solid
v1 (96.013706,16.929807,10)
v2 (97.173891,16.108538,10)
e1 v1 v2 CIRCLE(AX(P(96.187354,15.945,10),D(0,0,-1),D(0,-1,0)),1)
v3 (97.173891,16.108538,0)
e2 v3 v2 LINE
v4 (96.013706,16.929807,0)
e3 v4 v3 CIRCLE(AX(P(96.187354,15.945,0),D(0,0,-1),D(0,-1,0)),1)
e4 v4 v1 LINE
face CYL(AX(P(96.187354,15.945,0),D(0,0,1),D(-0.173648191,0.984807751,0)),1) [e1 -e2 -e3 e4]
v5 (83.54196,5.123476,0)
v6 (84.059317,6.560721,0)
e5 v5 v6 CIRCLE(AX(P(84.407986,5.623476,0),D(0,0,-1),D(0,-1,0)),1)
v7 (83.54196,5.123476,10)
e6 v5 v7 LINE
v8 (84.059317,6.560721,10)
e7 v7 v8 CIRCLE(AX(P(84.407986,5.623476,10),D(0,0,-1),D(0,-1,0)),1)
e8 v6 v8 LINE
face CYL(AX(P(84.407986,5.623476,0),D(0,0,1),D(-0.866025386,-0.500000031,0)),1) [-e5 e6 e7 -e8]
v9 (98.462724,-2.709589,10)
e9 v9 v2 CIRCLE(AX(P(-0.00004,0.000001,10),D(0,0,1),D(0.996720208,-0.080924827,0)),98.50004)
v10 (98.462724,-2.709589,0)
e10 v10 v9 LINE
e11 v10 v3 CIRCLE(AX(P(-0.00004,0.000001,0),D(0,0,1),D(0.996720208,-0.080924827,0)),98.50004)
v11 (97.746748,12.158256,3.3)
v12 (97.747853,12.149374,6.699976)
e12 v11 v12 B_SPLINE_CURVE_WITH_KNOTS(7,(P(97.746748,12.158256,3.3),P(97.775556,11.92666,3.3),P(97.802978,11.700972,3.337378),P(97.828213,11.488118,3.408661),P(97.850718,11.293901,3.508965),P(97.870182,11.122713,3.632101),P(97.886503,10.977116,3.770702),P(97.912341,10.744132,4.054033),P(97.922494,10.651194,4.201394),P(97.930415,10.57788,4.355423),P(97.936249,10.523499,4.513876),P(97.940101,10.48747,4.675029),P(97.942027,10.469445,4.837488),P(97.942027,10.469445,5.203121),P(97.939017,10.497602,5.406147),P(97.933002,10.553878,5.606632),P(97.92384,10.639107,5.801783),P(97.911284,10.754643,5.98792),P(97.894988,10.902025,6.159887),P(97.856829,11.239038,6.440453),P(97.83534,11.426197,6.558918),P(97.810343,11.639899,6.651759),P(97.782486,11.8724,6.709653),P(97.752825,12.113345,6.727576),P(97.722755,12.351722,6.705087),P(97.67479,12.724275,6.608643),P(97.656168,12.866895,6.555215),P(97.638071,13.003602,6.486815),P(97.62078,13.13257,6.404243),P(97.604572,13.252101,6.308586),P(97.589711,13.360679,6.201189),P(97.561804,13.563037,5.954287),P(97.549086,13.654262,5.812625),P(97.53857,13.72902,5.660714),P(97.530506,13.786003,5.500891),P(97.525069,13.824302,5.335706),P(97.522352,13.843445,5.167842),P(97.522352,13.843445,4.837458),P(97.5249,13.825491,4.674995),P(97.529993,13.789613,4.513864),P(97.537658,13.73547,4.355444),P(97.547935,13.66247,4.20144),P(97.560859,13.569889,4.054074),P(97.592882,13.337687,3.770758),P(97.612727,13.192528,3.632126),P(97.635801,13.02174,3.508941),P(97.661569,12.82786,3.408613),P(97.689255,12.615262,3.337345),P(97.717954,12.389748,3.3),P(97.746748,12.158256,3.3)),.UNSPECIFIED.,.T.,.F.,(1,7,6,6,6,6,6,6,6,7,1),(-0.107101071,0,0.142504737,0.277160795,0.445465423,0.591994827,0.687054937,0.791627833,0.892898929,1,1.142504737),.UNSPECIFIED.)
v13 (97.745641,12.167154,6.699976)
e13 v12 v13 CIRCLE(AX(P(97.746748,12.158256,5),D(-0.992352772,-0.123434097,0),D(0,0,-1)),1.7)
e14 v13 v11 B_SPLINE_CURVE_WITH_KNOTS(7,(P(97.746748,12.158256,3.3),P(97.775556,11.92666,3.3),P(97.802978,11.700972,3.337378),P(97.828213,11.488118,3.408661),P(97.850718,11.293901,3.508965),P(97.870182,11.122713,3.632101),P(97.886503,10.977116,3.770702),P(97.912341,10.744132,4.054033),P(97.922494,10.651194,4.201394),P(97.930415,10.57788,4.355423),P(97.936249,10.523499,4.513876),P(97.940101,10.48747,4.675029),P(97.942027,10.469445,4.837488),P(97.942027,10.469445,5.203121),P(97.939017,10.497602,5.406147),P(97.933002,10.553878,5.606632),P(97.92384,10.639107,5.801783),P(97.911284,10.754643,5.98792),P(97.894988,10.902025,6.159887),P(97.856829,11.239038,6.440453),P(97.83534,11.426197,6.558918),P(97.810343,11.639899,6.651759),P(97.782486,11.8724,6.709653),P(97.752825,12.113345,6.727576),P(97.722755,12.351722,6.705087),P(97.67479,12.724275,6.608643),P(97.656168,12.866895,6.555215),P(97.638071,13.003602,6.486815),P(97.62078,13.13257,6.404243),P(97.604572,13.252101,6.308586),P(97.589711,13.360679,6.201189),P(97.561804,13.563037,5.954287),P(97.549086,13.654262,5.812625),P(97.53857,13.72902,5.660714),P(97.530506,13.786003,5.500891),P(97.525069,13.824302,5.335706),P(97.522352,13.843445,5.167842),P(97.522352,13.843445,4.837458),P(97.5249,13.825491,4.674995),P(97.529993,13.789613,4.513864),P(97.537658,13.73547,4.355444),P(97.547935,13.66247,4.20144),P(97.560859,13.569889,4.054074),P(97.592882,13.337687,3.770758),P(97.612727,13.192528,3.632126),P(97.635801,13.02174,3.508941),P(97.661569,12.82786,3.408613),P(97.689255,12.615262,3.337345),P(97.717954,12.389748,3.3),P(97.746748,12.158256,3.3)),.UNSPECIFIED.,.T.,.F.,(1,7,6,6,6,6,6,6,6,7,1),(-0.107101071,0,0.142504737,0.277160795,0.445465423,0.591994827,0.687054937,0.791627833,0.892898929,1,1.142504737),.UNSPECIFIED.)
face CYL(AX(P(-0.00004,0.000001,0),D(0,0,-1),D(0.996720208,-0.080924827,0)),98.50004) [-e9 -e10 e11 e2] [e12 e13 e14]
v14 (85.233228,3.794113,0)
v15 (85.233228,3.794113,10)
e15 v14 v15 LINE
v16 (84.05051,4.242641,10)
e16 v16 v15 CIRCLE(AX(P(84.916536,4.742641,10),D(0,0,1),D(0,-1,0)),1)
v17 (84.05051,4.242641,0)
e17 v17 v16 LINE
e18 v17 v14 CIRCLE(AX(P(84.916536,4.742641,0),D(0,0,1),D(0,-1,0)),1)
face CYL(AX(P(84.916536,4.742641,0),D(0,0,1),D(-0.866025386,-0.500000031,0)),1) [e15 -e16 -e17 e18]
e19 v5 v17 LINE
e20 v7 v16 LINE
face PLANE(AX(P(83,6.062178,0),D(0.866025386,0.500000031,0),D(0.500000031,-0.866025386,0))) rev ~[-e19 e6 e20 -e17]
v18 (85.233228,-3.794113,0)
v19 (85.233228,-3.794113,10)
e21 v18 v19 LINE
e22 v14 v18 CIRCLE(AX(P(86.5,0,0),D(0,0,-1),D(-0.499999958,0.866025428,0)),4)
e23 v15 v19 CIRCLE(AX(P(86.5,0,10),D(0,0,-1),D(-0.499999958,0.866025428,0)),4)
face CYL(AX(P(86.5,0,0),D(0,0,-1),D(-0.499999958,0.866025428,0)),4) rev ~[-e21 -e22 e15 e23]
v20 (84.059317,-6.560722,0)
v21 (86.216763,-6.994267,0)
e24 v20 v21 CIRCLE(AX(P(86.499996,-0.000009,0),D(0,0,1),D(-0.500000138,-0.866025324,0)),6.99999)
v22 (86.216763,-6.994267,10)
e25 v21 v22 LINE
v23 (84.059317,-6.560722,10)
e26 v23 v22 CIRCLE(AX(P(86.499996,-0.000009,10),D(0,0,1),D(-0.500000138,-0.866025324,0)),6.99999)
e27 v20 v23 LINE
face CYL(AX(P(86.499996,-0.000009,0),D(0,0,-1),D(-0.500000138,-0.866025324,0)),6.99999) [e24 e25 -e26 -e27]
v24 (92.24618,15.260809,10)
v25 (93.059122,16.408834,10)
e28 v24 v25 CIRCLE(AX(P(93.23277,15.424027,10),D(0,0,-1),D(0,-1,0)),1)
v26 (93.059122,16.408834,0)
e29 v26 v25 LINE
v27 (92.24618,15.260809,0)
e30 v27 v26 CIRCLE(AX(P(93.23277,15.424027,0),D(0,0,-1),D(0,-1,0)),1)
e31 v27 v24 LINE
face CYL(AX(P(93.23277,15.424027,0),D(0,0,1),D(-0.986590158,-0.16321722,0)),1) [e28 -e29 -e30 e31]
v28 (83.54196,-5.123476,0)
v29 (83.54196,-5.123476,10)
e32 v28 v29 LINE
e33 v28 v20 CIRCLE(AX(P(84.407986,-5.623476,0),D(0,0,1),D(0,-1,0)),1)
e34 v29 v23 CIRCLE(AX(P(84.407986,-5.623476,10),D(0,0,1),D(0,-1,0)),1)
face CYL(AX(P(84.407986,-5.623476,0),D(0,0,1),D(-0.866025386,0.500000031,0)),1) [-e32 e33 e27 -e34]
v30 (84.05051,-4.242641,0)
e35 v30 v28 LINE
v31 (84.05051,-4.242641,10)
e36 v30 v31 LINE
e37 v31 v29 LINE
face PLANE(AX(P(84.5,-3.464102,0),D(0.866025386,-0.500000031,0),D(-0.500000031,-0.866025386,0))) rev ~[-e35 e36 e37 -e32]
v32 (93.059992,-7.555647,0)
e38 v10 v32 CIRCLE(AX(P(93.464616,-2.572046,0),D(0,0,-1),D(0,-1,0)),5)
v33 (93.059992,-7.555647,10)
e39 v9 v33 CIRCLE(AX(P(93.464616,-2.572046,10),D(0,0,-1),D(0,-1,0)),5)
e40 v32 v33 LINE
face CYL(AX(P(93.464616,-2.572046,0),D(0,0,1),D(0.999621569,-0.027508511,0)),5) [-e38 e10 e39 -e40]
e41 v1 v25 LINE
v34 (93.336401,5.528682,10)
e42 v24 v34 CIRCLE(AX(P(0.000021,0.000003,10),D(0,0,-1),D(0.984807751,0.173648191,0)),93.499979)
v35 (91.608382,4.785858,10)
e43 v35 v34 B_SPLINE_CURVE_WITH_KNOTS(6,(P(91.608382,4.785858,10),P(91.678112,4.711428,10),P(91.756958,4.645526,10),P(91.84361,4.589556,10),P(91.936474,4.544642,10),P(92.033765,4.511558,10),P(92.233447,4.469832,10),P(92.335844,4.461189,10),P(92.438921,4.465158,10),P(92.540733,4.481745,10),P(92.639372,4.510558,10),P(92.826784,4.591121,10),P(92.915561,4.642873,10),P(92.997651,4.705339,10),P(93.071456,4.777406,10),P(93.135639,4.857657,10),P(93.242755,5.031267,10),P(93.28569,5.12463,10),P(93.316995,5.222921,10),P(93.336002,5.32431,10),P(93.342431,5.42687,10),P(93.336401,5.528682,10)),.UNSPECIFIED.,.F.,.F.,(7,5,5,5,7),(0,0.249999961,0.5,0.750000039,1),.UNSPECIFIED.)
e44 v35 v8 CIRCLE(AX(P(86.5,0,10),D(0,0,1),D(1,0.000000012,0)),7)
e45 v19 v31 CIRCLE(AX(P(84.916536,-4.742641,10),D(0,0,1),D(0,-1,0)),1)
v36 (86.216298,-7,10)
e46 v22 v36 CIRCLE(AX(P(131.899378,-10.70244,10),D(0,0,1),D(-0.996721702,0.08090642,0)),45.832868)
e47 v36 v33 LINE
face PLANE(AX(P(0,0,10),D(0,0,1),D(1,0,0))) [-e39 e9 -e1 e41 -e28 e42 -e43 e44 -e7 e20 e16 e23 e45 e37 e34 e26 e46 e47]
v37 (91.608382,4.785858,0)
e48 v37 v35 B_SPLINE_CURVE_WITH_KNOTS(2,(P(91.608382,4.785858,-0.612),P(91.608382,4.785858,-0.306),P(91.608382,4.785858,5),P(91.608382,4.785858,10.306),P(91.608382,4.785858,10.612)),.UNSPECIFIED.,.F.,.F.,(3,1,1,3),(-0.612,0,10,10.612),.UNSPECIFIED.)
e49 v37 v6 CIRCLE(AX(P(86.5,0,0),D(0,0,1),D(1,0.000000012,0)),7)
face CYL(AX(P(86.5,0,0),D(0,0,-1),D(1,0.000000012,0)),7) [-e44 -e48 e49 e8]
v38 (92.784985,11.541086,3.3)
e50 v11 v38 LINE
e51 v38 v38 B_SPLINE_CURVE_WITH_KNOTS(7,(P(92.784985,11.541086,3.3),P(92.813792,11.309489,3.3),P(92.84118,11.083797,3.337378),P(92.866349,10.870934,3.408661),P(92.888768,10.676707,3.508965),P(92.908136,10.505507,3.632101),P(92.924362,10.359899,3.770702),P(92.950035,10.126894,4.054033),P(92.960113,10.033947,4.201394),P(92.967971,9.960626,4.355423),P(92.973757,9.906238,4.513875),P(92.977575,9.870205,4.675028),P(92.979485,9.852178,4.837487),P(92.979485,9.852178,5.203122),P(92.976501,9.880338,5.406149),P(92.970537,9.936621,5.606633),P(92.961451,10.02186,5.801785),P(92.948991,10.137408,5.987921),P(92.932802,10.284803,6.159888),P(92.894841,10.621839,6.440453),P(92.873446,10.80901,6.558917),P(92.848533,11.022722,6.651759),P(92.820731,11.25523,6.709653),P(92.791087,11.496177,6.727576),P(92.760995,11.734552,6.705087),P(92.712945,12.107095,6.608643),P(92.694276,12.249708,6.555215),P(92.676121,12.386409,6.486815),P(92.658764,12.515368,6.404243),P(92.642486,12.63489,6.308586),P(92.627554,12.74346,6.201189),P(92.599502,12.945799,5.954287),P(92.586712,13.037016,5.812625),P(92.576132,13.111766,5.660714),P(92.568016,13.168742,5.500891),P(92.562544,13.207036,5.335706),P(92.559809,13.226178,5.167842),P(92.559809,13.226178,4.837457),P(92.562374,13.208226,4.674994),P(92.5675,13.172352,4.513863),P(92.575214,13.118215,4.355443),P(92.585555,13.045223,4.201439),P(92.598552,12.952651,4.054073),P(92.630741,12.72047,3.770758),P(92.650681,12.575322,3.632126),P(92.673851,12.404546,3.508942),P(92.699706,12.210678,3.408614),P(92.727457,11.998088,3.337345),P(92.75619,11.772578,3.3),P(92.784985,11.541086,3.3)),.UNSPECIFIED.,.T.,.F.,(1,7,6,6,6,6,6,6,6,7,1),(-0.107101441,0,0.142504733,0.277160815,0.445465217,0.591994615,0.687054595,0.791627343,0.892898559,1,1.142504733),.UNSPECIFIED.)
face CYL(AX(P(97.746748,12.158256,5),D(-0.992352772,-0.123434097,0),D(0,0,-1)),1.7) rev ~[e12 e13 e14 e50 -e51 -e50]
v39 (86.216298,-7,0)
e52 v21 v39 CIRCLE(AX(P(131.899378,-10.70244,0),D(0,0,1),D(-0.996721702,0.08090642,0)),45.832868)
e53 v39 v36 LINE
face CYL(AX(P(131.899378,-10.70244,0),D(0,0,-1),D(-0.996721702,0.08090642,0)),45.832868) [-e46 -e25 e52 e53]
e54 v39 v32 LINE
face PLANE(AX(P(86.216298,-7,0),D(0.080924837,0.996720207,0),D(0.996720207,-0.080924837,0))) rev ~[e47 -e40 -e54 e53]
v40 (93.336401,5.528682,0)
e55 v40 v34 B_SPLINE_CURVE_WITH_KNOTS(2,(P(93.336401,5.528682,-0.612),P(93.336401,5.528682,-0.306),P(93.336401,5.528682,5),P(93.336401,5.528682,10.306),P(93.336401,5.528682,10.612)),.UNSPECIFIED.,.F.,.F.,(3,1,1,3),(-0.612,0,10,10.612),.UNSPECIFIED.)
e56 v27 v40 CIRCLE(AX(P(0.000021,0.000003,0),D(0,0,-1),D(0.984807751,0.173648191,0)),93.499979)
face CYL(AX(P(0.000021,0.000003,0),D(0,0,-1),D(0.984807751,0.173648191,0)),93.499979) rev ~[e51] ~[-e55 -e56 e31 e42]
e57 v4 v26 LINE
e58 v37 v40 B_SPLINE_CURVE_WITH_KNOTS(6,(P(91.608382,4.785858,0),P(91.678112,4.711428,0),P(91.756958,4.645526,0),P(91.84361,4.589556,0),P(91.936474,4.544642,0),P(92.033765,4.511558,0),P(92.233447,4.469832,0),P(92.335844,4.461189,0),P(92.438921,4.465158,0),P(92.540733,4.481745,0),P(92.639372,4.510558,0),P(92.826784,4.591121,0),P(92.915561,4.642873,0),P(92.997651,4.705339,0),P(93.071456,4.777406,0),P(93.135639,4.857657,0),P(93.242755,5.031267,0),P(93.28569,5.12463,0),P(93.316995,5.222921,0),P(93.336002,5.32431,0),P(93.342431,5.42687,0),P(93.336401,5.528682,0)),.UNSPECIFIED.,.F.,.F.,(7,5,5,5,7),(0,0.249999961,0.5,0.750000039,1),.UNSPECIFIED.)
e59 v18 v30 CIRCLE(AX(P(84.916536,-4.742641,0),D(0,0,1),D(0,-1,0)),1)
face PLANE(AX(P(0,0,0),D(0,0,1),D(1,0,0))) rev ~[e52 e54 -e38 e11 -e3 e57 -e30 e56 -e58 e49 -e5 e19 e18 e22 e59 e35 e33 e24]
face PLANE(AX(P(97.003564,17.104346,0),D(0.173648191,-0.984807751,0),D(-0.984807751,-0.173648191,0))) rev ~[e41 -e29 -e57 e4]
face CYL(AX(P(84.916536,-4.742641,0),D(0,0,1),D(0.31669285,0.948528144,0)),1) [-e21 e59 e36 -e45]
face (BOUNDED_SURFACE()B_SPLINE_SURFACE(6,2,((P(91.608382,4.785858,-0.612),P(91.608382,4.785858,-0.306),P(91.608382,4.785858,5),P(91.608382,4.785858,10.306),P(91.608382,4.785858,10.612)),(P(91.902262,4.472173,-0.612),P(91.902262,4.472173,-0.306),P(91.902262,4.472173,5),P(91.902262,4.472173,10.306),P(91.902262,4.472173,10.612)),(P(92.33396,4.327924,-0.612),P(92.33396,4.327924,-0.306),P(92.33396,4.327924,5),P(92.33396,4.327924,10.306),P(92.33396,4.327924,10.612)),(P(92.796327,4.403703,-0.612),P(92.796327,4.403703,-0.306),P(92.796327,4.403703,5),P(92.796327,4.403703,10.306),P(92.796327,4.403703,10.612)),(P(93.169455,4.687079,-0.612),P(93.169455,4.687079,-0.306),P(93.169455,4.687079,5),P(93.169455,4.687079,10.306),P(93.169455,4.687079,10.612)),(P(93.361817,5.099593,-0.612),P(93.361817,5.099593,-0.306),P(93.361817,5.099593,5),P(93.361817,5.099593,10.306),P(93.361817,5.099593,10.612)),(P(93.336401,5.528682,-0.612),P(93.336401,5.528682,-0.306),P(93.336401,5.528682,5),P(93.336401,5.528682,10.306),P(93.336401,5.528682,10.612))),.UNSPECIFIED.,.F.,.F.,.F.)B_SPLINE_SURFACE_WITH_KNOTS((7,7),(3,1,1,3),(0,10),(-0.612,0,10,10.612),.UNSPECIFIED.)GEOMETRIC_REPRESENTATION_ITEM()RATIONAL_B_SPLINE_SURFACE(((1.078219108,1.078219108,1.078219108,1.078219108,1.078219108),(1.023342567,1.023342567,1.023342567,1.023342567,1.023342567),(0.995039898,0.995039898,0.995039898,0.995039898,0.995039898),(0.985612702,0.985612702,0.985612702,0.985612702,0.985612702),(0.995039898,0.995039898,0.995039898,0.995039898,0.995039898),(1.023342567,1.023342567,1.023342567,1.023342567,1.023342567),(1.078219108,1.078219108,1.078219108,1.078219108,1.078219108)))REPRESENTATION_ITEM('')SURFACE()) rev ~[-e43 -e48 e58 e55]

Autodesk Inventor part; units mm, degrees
ref_plane "YZ Plane" through (0, 0, 0) normal (1, 0, 0) x (0, 1, 0)
ref_plane "XZ Plane" through (0, 0, 0) normal (0, 1, 0) x (-1, 0, 0)
sketch "スケッチ1" plane through (0, 0, 0) normal (0, 0, 1) x (1, 0, 0)
  circle A0 centre (0, 0) radius 98.5
  circle A1 centre (0, 0) radius 86.5
  circle A2 centre (86.5, 0) radius 4
  circle A3 centre (86.5, 0) radius 7
  line L0 (0, 0) -> (98.5, 0)
  circle A4 centre (0, 0) radius 93.5
  line L1 (0, 0) -> (97.003564, 17.104346)
  line L2 (0, 0) -> (98.17694, -7.971098)
  line L3 (86.5, 0) -> (83, 6.062178)
  line L4 (86.5, 0) -> (83, -6.062178)
  line L5 (97.746748, 12.158256) -> (0, 0)
  point P0 (84.5, -3.464102)
  point P1 (83, -6.062178)
  point P2 (86.216763, -6.994267)
  point P3 (86.216298, -7)
  point P4 (92.079525, 16.236105)
  point P5 (93.5, 0)
  point P6 (84.5, 3.464102)
  dimension "d1" = 173
  dimension "d3" = 14
  dimension "d0" = 197
  dimension "d2" = 8
  dimension "d4" = 187
  dimension "d5" = 10
  dimension "d6" = 60
  dimension "d11" = 5
  dimension "d20" = 7.09
sketch "スケッチ1 outline for 押し出し1" plane through (0, 0, 0) normal (0, 0, 1) x (1, 0, 0)
  arc A0 (84.5, 3.464102) -> (84.5, -3.464102) centre (86.5, 0) cw
  line L0 (83, 6.062178) -> (84.5, 3.464102)
  arc A1 (93.5, 0) -> (83, 6.062178) centre (86.5, 0) ccw
  arc A2 (92.079525, 16.236105) -> (93.5, 0) centre (0, 0) cw
  line L1 (97.003564, 17.104346) -> (92.079525, 16.236105)
  arc A3 (98.17694, -7.971098) -> (97.003564, 17.104346) centre (0, 0) ccw
  line L2 (86.216298, -7) -> (98.17694, -7.971098)
  arc A4 (86.216763, -6.994267) -> (86.216298, -7) centre (-0.000023, 0.000002) cw
  arc A5 (83, -6.062178) -> (86.216763, -6.994267) centre (86.5, 0) ccw
  line L3 (84.5, -3.464102) -> (83, -6.062178)
extrude "押し出し1" add sketch "スケッチ1 outline for 押し出し1" along normal blind 10
ref_plane "作業平面1" through (97.746748, 12.158256, 0) normal (0.9923528, 0.1234341, 0) x (-0.1234341, 0.9923528, 0)
sketch "スケッチ2" plane through (97.746748, 12.158256, 0) normal (0.9923528, 0.1234341, 0) x (-0.1234341, 0.9923528, 0)
  line L0 (5, 10) -> (-20.028521, 10)
  point P0 (0, 0)
  point P1 (0, 5)
  dimension "d12" = 5
hole "穴1" at (97.746748, 12.158256, 5) direction (-0.9923528, -0.1234341, 0) diameter 3.4 end through all
fillet "フィレット1" radius 1 7 edges at (83, -6.0622, 5) (84.5, -3.4641, 5) (84.5, 3.4641, 5) (83, 6.0622, 5) (93.5, 0, 5) (92.0795, 16.2361, 5) (97.0036, 17.1043, 5)
fillet "フィレット2" radius 5 1 edges at (98.1769, -7.9711, 5)
properties part number "TH22_3DP_cover_fixer_sn" material "ABS プラスチック"
